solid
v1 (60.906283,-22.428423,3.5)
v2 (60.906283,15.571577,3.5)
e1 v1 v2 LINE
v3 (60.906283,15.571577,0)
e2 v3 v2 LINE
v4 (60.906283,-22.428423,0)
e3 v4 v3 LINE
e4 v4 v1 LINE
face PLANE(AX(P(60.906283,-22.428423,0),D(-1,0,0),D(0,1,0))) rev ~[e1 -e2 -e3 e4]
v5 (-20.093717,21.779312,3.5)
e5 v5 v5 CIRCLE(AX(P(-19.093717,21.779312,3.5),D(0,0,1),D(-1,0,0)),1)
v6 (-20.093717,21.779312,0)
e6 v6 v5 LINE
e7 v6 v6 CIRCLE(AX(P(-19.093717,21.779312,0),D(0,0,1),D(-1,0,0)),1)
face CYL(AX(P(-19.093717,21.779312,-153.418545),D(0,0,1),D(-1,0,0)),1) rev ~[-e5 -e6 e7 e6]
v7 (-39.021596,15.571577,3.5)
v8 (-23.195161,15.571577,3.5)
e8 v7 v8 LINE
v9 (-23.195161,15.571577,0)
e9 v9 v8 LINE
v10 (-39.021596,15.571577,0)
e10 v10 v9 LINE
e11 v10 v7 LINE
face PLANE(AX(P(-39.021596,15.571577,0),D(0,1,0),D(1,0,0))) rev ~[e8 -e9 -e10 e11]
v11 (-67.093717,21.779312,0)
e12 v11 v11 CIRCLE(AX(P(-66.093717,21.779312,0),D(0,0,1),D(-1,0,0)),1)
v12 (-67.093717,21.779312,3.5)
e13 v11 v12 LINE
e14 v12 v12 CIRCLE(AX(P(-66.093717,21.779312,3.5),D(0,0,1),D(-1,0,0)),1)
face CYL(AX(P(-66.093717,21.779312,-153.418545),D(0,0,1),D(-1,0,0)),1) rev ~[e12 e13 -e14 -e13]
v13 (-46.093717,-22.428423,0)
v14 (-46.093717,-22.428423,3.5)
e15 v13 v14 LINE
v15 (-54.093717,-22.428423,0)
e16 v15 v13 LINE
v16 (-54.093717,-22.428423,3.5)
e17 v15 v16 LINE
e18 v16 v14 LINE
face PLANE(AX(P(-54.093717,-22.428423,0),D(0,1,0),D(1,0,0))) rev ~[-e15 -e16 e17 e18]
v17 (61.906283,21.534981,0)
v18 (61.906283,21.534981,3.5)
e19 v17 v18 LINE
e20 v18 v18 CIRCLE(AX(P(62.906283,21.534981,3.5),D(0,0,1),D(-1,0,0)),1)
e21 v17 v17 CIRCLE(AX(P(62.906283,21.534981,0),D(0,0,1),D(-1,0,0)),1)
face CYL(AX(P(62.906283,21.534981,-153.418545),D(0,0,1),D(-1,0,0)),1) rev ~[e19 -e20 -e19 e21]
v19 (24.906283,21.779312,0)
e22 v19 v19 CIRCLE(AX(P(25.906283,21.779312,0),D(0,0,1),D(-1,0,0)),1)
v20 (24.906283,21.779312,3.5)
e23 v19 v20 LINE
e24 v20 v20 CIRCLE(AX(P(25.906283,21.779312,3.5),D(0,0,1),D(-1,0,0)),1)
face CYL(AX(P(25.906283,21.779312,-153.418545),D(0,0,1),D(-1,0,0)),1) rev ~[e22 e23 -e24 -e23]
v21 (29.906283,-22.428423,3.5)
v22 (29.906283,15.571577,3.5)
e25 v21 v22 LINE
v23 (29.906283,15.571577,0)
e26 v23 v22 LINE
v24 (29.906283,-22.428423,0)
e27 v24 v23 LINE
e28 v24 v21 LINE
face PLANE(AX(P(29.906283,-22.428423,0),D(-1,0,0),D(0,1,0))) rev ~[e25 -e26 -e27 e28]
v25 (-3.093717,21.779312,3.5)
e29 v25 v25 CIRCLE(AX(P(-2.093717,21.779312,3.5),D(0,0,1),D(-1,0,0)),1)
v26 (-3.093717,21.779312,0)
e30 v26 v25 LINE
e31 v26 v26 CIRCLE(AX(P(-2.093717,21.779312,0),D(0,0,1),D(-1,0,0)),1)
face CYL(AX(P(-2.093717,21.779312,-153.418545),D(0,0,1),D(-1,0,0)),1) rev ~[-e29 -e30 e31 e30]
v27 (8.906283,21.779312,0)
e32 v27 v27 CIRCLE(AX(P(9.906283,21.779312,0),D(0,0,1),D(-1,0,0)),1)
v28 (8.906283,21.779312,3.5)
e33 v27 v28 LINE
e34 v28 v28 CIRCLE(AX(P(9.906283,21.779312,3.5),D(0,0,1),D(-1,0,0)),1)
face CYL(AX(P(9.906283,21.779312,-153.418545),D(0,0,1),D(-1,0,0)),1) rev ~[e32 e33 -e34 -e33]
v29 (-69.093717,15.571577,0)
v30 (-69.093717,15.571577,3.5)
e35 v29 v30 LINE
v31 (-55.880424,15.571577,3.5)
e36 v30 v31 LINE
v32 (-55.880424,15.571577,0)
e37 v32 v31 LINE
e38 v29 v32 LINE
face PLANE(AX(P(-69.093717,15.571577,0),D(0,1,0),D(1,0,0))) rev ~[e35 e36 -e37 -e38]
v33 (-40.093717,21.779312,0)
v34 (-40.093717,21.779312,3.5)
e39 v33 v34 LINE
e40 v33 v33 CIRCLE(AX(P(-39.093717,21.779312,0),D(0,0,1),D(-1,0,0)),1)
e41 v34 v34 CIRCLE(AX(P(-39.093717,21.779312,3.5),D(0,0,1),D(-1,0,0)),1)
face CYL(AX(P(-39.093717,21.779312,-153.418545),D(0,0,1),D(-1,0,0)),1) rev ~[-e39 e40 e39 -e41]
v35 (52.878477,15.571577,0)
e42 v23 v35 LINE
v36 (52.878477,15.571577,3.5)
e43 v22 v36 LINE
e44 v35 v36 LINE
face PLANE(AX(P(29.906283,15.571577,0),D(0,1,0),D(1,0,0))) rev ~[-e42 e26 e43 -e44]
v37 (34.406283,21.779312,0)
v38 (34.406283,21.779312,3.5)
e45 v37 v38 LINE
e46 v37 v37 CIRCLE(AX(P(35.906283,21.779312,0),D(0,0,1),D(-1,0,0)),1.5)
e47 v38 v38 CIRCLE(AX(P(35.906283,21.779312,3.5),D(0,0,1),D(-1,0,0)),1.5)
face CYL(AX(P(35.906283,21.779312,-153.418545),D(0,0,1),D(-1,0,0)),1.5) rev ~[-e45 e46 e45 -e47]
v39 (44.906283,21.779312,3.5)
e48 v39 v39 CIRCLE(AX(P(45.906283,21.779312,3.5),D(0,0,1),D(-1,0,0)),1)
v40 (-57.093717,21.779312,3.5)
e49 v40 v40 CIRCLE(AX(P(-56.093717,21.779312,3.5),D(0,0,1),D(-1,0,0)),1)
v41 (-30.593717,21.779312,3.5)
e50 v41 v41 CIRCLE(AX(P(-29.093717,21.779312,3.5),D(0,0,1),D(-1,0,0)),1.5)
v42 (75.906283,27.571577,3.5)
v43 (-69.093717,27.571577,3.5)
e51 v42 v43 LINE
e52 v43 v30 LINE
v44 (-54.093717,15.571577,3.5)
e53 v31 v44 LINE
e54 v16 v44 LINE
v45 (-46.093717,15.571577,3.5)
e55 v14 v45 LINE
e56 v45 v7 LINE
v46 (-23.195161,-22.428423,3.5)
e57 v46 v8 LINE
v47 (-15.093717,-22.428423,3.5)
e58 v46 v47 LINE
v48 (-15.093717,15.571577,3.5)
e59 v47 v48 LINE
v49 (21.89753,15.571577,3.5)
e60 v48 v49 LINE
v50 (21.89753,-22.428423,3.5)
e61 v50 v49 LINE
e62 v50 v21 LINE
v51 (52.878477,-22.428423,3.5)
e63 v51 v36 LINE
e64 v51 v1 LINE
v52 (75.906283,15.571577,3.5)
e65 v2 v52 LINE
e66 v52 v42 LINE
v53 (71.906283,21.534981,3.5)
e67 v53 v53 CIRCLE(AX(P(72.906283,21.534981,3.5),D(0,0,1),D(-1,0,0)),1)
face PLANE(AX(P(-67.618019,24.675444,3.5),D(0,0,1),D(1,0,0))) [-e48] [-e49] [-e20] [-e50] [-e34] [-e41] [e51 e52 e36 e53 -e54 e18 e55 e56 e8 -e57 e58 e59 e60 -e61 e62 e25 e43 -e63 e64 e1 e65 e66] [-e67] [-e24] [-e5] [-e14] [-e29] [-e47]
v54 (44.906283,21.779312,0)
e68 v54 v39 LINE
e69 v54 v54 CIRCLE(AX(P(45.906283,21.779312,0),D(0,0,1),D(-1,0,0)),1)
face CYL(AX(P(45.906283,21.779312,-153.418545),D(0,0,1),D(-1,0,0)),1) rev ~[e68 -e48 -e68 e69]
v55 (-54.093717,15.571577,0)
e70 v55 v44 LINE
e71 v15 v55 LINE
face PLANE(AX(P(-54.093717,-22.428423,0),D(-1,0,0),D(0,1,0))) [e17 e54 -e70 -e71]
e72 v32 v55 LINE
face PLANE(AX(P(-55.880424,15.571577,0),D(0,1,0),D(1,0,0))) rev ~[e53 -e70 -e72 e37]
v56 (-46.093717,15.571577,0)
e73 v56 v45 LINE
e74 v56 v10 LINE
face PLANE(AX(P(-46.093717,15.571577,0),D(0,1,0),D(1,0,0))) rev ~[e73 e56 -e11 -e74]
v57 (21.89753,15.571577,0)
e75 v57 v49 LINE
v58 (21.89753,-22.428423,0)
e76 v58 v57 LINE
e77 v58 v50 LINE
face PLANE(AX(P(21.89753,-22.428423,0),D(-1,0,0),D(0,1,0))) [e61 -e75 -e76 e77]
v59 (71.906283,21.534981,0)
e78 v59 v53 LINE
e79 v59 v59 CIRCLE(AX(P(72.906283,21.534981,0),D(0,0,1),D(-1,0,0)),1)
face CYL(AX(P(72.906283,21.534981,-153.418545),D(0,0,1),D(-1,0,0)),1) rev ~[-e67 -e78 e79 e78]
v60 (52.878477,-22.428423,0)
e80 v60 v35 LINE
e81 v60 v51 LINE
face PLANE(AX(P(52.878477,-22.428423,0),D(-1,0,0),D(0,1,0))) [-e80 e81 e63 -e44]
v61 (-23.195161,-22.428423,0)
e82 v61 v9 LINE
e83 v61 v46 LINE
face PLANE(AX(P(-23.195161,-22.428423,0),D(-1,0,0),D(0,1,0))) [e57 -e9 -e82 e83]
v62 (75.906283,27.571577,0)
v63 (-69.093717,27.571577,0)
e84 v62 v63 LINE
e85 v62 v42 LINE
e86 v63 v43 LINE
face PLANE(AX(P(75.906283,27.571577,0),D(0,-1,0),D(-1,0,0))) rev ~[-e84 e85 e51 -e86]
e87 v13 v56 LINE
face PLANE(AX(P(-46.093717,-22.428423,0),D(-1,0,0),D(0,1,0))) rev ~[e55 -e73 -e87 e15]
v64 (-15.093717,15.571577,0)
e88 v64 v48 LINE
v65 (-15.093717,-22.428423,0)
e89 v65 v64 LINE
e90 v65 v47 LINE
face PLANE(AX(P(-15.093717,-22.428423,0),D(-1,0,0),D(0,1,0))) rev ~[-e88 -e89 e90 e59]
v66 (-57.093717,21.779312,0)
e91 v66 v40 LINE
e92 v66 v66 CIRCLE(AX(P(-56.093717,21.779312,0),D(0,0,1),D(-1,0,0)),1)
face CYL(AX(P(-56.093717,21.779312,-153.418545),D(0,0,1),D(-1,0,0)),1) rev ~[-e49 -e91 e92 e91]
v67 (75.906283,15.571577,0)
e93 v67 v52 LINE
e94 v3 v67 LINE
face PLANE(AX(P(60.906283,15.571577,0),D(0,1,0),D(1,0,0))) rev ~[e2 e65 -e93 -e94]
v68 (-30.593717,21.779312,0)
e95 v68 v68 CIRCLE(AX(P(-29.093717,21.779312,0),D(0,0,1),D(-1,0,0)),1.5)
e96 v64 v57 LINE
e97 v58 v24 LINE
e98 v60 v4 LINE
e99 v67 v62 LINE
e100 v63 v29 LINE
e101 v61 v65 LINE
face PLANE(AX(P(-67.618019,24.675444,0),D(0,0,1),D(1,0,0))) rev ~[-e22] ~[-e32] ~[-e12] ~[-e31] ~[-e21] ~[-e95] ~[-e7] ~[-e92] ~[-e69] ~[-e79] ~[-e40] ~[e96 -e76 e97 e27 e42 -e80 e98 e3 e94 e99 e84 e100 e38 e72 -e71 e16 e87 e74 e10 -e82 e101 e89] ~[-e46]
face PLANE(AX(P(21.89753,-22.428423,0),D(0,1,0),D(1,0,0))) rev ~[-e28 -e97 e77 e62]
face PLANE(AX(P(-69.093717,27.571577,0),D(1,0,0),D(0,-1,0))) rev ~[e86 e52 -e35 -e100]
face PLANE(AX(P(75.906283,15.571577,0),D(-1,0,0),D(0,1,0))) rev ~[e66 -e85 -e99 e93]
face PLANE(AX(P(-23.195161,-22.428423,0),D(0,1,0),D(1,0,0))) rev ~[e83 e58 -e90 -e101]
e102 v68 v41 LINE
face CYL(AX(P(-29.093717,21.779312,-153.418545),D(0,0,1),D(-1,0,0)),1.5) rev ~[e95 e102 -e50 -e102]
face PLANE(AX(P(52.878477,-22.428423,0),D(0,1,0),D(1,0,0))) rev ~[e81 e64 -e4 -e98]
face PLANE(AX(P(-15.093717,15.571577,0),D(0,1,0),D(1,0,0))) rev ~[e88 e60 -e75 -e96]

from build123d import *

# Parameters (mm, degrees)
F0_W     = 2.9513968527
F0_H     = 5.7922647223
F0_W_2   = 10.2618969977
F0_H_2   = 6.2077352777
F0_W_3   = 16.8588273227
F0_W_4   = 37.1382929152
F0_W_5   = 8
F0_H_3   = 38
F0_W_6   = 8.1014430672
F0_W_7   = 8.0087523311
F0_W_8   = 8.027805835
F1_DEPTH = 3.5
F2_D     = 2
F3_D     = 3


# Not quite as in the source:
# - a feature names something its author has since deleted; it is built from what else it names


with BuildPart() as f1:
    # F0 (on Top) → F1 (new body)
    with BuildSketch(Plane.XY):
        with Locations((-67.6180190593, 24.675444182)):
            Rectangle(F0_W, F0_H)
        with Locations((-61.0113721341, 24.675444182)):
            Rectangle(F0_W_2, F0_H)
        with Locations((-67.6180190593, 18.675444182)):
            Rectangle(F0_W, F0_H_2)
        with Locations((-47.4510099739, 24.675444182)):
            Rectangle(F0_W_3, F0_H)
        with Locations((-61.0113721341, 18.675444182)):
            Rectangle(F0_W_2, F0_H_2)
        with Locations((-20.4524498549, 24.675444182)):
            Rectangle(F0_W_4, F0_H)
        Polygon((-39.0215963125, 21.7793118209), (-55.8804236352, 21.7793118209), (-55.8804236352, 15.5715765432), (-54.0937174857, 15.5715765432), (-46.0937174857, 15.5715765432), (-39.0215963125, 15.5715765432), align=None)
        Polygon((9.8445750773, 27.5715765432), (-1.8833033973, 27.5715765432), (-1.8833033973, 21.7793118209), (9.8743605615, 21.7793118209), align=None)
        Polygon((-1.8833033973, 21.7793118209), (-39.0215963125, 21.7793118209), (-39.0215963125, 15.5715765432), (-23.1951605529, 15.5715765432), (-15.0937174857, 15.5715765432), (-1.8833033973, 15.5715765432), align=None)
        Polygon((62.8643706441, 27.5715765432), (9.8445750773, 27.5715765432), (9.8743605615, 21.7793118209), (62.8643706441, 21.7793118209), align=None)
        Polygon((9.8743605615, 21.7793118209), (-1.8833033973, 21.7793118209), (-1.8833033973, 15.5715765432), (9.9062825143, 15.5715765432), align=None)
        with Locations((-50.0937174857, -3.4284234568)):
            Rectangle(F0_W_5, F0_H_3)
        Polygon((72.6376026869, 27.5715765432), (62.8643706441, 27.5715765432), (62.8643706441, 21.7793118209), (72.7672914107, 21.7793118209), align=None)
        Polygon((62.8643706441, 21.7793118209), (9.8743605615, 21.7793118209), (9.9062825143, 15.5715765432), (21.8975301832, 15.5715765432), (29.9062825143, 15.5715765432), (52.8784766793, 15.5715765432), (60.9062825143, 15.5715765432), (62.8643706441, 15.5715765432), align=None)
        with Locations((-19.1444390193, -3.4284234568)):
            Rectangle(F0_W_6, F0_H_3)
        Polygon((75.9062825143, 27.5715765432), (72.6376026869, 27.5715765432), (72.7672914107, 21.7793118209), (75.9062825143, 21.7793118209), align=None)
        Polygon((72.7672914107, 21.7793118209), (62.8643706441, 21.7793118209), (62.8643706441, 15.5715765432), (72.9062825143, 15.5715765432), align=None)
        Polygon((75.9062825143, 21.7793118209), (72.7672914107, 21.7793118209), (72.9062825143, 15.5715765432), (75.9062825143, 15.5715765432), align=None)
        with Locations((25.9019063488, -3.4284234568)):
            Rectangle(F0_W_7, F0_H_3)
        with Locations((56.8923795968, -3.4284234568)):
            Rectangle(F0_W_8, F0_H_3)
    extrude(amount=F1_DEPTH)

    # F2 (through all)
    with Locations(Plane(origin=(0, 0, 0), x_dir=(1, 0, 0), z_dir=(0, 0, -1))):
        with Locations((-66.0937174857, -21.7793118209), (-56.0937174857, -21.7793118209), (-39.0937174857, -21.7793118209), (-19.0937174857, -21.7793118209), (-2.0937174857, -21.7793118209), (9.9062825143, -21.7793118209), (25.9062825143, -21.7793118209), (45.9062825143, -21.7793118209), (62.9062825143, -21.5349812061), (72.9062825143, -21.5349812061)):
            Hole(F2_D / 2)

    # F3 (through all)
    with Locations(Plane(origin=(0, 0, 0), x_dir=(1, 0, 0), z_dir=(0, 0, -1))):
        with Locations((-29.0937174857, -21.7793118209), (35.9062825143, -21.7793118209)):
            Hole(F3_D / 2)


solid = f1.part
